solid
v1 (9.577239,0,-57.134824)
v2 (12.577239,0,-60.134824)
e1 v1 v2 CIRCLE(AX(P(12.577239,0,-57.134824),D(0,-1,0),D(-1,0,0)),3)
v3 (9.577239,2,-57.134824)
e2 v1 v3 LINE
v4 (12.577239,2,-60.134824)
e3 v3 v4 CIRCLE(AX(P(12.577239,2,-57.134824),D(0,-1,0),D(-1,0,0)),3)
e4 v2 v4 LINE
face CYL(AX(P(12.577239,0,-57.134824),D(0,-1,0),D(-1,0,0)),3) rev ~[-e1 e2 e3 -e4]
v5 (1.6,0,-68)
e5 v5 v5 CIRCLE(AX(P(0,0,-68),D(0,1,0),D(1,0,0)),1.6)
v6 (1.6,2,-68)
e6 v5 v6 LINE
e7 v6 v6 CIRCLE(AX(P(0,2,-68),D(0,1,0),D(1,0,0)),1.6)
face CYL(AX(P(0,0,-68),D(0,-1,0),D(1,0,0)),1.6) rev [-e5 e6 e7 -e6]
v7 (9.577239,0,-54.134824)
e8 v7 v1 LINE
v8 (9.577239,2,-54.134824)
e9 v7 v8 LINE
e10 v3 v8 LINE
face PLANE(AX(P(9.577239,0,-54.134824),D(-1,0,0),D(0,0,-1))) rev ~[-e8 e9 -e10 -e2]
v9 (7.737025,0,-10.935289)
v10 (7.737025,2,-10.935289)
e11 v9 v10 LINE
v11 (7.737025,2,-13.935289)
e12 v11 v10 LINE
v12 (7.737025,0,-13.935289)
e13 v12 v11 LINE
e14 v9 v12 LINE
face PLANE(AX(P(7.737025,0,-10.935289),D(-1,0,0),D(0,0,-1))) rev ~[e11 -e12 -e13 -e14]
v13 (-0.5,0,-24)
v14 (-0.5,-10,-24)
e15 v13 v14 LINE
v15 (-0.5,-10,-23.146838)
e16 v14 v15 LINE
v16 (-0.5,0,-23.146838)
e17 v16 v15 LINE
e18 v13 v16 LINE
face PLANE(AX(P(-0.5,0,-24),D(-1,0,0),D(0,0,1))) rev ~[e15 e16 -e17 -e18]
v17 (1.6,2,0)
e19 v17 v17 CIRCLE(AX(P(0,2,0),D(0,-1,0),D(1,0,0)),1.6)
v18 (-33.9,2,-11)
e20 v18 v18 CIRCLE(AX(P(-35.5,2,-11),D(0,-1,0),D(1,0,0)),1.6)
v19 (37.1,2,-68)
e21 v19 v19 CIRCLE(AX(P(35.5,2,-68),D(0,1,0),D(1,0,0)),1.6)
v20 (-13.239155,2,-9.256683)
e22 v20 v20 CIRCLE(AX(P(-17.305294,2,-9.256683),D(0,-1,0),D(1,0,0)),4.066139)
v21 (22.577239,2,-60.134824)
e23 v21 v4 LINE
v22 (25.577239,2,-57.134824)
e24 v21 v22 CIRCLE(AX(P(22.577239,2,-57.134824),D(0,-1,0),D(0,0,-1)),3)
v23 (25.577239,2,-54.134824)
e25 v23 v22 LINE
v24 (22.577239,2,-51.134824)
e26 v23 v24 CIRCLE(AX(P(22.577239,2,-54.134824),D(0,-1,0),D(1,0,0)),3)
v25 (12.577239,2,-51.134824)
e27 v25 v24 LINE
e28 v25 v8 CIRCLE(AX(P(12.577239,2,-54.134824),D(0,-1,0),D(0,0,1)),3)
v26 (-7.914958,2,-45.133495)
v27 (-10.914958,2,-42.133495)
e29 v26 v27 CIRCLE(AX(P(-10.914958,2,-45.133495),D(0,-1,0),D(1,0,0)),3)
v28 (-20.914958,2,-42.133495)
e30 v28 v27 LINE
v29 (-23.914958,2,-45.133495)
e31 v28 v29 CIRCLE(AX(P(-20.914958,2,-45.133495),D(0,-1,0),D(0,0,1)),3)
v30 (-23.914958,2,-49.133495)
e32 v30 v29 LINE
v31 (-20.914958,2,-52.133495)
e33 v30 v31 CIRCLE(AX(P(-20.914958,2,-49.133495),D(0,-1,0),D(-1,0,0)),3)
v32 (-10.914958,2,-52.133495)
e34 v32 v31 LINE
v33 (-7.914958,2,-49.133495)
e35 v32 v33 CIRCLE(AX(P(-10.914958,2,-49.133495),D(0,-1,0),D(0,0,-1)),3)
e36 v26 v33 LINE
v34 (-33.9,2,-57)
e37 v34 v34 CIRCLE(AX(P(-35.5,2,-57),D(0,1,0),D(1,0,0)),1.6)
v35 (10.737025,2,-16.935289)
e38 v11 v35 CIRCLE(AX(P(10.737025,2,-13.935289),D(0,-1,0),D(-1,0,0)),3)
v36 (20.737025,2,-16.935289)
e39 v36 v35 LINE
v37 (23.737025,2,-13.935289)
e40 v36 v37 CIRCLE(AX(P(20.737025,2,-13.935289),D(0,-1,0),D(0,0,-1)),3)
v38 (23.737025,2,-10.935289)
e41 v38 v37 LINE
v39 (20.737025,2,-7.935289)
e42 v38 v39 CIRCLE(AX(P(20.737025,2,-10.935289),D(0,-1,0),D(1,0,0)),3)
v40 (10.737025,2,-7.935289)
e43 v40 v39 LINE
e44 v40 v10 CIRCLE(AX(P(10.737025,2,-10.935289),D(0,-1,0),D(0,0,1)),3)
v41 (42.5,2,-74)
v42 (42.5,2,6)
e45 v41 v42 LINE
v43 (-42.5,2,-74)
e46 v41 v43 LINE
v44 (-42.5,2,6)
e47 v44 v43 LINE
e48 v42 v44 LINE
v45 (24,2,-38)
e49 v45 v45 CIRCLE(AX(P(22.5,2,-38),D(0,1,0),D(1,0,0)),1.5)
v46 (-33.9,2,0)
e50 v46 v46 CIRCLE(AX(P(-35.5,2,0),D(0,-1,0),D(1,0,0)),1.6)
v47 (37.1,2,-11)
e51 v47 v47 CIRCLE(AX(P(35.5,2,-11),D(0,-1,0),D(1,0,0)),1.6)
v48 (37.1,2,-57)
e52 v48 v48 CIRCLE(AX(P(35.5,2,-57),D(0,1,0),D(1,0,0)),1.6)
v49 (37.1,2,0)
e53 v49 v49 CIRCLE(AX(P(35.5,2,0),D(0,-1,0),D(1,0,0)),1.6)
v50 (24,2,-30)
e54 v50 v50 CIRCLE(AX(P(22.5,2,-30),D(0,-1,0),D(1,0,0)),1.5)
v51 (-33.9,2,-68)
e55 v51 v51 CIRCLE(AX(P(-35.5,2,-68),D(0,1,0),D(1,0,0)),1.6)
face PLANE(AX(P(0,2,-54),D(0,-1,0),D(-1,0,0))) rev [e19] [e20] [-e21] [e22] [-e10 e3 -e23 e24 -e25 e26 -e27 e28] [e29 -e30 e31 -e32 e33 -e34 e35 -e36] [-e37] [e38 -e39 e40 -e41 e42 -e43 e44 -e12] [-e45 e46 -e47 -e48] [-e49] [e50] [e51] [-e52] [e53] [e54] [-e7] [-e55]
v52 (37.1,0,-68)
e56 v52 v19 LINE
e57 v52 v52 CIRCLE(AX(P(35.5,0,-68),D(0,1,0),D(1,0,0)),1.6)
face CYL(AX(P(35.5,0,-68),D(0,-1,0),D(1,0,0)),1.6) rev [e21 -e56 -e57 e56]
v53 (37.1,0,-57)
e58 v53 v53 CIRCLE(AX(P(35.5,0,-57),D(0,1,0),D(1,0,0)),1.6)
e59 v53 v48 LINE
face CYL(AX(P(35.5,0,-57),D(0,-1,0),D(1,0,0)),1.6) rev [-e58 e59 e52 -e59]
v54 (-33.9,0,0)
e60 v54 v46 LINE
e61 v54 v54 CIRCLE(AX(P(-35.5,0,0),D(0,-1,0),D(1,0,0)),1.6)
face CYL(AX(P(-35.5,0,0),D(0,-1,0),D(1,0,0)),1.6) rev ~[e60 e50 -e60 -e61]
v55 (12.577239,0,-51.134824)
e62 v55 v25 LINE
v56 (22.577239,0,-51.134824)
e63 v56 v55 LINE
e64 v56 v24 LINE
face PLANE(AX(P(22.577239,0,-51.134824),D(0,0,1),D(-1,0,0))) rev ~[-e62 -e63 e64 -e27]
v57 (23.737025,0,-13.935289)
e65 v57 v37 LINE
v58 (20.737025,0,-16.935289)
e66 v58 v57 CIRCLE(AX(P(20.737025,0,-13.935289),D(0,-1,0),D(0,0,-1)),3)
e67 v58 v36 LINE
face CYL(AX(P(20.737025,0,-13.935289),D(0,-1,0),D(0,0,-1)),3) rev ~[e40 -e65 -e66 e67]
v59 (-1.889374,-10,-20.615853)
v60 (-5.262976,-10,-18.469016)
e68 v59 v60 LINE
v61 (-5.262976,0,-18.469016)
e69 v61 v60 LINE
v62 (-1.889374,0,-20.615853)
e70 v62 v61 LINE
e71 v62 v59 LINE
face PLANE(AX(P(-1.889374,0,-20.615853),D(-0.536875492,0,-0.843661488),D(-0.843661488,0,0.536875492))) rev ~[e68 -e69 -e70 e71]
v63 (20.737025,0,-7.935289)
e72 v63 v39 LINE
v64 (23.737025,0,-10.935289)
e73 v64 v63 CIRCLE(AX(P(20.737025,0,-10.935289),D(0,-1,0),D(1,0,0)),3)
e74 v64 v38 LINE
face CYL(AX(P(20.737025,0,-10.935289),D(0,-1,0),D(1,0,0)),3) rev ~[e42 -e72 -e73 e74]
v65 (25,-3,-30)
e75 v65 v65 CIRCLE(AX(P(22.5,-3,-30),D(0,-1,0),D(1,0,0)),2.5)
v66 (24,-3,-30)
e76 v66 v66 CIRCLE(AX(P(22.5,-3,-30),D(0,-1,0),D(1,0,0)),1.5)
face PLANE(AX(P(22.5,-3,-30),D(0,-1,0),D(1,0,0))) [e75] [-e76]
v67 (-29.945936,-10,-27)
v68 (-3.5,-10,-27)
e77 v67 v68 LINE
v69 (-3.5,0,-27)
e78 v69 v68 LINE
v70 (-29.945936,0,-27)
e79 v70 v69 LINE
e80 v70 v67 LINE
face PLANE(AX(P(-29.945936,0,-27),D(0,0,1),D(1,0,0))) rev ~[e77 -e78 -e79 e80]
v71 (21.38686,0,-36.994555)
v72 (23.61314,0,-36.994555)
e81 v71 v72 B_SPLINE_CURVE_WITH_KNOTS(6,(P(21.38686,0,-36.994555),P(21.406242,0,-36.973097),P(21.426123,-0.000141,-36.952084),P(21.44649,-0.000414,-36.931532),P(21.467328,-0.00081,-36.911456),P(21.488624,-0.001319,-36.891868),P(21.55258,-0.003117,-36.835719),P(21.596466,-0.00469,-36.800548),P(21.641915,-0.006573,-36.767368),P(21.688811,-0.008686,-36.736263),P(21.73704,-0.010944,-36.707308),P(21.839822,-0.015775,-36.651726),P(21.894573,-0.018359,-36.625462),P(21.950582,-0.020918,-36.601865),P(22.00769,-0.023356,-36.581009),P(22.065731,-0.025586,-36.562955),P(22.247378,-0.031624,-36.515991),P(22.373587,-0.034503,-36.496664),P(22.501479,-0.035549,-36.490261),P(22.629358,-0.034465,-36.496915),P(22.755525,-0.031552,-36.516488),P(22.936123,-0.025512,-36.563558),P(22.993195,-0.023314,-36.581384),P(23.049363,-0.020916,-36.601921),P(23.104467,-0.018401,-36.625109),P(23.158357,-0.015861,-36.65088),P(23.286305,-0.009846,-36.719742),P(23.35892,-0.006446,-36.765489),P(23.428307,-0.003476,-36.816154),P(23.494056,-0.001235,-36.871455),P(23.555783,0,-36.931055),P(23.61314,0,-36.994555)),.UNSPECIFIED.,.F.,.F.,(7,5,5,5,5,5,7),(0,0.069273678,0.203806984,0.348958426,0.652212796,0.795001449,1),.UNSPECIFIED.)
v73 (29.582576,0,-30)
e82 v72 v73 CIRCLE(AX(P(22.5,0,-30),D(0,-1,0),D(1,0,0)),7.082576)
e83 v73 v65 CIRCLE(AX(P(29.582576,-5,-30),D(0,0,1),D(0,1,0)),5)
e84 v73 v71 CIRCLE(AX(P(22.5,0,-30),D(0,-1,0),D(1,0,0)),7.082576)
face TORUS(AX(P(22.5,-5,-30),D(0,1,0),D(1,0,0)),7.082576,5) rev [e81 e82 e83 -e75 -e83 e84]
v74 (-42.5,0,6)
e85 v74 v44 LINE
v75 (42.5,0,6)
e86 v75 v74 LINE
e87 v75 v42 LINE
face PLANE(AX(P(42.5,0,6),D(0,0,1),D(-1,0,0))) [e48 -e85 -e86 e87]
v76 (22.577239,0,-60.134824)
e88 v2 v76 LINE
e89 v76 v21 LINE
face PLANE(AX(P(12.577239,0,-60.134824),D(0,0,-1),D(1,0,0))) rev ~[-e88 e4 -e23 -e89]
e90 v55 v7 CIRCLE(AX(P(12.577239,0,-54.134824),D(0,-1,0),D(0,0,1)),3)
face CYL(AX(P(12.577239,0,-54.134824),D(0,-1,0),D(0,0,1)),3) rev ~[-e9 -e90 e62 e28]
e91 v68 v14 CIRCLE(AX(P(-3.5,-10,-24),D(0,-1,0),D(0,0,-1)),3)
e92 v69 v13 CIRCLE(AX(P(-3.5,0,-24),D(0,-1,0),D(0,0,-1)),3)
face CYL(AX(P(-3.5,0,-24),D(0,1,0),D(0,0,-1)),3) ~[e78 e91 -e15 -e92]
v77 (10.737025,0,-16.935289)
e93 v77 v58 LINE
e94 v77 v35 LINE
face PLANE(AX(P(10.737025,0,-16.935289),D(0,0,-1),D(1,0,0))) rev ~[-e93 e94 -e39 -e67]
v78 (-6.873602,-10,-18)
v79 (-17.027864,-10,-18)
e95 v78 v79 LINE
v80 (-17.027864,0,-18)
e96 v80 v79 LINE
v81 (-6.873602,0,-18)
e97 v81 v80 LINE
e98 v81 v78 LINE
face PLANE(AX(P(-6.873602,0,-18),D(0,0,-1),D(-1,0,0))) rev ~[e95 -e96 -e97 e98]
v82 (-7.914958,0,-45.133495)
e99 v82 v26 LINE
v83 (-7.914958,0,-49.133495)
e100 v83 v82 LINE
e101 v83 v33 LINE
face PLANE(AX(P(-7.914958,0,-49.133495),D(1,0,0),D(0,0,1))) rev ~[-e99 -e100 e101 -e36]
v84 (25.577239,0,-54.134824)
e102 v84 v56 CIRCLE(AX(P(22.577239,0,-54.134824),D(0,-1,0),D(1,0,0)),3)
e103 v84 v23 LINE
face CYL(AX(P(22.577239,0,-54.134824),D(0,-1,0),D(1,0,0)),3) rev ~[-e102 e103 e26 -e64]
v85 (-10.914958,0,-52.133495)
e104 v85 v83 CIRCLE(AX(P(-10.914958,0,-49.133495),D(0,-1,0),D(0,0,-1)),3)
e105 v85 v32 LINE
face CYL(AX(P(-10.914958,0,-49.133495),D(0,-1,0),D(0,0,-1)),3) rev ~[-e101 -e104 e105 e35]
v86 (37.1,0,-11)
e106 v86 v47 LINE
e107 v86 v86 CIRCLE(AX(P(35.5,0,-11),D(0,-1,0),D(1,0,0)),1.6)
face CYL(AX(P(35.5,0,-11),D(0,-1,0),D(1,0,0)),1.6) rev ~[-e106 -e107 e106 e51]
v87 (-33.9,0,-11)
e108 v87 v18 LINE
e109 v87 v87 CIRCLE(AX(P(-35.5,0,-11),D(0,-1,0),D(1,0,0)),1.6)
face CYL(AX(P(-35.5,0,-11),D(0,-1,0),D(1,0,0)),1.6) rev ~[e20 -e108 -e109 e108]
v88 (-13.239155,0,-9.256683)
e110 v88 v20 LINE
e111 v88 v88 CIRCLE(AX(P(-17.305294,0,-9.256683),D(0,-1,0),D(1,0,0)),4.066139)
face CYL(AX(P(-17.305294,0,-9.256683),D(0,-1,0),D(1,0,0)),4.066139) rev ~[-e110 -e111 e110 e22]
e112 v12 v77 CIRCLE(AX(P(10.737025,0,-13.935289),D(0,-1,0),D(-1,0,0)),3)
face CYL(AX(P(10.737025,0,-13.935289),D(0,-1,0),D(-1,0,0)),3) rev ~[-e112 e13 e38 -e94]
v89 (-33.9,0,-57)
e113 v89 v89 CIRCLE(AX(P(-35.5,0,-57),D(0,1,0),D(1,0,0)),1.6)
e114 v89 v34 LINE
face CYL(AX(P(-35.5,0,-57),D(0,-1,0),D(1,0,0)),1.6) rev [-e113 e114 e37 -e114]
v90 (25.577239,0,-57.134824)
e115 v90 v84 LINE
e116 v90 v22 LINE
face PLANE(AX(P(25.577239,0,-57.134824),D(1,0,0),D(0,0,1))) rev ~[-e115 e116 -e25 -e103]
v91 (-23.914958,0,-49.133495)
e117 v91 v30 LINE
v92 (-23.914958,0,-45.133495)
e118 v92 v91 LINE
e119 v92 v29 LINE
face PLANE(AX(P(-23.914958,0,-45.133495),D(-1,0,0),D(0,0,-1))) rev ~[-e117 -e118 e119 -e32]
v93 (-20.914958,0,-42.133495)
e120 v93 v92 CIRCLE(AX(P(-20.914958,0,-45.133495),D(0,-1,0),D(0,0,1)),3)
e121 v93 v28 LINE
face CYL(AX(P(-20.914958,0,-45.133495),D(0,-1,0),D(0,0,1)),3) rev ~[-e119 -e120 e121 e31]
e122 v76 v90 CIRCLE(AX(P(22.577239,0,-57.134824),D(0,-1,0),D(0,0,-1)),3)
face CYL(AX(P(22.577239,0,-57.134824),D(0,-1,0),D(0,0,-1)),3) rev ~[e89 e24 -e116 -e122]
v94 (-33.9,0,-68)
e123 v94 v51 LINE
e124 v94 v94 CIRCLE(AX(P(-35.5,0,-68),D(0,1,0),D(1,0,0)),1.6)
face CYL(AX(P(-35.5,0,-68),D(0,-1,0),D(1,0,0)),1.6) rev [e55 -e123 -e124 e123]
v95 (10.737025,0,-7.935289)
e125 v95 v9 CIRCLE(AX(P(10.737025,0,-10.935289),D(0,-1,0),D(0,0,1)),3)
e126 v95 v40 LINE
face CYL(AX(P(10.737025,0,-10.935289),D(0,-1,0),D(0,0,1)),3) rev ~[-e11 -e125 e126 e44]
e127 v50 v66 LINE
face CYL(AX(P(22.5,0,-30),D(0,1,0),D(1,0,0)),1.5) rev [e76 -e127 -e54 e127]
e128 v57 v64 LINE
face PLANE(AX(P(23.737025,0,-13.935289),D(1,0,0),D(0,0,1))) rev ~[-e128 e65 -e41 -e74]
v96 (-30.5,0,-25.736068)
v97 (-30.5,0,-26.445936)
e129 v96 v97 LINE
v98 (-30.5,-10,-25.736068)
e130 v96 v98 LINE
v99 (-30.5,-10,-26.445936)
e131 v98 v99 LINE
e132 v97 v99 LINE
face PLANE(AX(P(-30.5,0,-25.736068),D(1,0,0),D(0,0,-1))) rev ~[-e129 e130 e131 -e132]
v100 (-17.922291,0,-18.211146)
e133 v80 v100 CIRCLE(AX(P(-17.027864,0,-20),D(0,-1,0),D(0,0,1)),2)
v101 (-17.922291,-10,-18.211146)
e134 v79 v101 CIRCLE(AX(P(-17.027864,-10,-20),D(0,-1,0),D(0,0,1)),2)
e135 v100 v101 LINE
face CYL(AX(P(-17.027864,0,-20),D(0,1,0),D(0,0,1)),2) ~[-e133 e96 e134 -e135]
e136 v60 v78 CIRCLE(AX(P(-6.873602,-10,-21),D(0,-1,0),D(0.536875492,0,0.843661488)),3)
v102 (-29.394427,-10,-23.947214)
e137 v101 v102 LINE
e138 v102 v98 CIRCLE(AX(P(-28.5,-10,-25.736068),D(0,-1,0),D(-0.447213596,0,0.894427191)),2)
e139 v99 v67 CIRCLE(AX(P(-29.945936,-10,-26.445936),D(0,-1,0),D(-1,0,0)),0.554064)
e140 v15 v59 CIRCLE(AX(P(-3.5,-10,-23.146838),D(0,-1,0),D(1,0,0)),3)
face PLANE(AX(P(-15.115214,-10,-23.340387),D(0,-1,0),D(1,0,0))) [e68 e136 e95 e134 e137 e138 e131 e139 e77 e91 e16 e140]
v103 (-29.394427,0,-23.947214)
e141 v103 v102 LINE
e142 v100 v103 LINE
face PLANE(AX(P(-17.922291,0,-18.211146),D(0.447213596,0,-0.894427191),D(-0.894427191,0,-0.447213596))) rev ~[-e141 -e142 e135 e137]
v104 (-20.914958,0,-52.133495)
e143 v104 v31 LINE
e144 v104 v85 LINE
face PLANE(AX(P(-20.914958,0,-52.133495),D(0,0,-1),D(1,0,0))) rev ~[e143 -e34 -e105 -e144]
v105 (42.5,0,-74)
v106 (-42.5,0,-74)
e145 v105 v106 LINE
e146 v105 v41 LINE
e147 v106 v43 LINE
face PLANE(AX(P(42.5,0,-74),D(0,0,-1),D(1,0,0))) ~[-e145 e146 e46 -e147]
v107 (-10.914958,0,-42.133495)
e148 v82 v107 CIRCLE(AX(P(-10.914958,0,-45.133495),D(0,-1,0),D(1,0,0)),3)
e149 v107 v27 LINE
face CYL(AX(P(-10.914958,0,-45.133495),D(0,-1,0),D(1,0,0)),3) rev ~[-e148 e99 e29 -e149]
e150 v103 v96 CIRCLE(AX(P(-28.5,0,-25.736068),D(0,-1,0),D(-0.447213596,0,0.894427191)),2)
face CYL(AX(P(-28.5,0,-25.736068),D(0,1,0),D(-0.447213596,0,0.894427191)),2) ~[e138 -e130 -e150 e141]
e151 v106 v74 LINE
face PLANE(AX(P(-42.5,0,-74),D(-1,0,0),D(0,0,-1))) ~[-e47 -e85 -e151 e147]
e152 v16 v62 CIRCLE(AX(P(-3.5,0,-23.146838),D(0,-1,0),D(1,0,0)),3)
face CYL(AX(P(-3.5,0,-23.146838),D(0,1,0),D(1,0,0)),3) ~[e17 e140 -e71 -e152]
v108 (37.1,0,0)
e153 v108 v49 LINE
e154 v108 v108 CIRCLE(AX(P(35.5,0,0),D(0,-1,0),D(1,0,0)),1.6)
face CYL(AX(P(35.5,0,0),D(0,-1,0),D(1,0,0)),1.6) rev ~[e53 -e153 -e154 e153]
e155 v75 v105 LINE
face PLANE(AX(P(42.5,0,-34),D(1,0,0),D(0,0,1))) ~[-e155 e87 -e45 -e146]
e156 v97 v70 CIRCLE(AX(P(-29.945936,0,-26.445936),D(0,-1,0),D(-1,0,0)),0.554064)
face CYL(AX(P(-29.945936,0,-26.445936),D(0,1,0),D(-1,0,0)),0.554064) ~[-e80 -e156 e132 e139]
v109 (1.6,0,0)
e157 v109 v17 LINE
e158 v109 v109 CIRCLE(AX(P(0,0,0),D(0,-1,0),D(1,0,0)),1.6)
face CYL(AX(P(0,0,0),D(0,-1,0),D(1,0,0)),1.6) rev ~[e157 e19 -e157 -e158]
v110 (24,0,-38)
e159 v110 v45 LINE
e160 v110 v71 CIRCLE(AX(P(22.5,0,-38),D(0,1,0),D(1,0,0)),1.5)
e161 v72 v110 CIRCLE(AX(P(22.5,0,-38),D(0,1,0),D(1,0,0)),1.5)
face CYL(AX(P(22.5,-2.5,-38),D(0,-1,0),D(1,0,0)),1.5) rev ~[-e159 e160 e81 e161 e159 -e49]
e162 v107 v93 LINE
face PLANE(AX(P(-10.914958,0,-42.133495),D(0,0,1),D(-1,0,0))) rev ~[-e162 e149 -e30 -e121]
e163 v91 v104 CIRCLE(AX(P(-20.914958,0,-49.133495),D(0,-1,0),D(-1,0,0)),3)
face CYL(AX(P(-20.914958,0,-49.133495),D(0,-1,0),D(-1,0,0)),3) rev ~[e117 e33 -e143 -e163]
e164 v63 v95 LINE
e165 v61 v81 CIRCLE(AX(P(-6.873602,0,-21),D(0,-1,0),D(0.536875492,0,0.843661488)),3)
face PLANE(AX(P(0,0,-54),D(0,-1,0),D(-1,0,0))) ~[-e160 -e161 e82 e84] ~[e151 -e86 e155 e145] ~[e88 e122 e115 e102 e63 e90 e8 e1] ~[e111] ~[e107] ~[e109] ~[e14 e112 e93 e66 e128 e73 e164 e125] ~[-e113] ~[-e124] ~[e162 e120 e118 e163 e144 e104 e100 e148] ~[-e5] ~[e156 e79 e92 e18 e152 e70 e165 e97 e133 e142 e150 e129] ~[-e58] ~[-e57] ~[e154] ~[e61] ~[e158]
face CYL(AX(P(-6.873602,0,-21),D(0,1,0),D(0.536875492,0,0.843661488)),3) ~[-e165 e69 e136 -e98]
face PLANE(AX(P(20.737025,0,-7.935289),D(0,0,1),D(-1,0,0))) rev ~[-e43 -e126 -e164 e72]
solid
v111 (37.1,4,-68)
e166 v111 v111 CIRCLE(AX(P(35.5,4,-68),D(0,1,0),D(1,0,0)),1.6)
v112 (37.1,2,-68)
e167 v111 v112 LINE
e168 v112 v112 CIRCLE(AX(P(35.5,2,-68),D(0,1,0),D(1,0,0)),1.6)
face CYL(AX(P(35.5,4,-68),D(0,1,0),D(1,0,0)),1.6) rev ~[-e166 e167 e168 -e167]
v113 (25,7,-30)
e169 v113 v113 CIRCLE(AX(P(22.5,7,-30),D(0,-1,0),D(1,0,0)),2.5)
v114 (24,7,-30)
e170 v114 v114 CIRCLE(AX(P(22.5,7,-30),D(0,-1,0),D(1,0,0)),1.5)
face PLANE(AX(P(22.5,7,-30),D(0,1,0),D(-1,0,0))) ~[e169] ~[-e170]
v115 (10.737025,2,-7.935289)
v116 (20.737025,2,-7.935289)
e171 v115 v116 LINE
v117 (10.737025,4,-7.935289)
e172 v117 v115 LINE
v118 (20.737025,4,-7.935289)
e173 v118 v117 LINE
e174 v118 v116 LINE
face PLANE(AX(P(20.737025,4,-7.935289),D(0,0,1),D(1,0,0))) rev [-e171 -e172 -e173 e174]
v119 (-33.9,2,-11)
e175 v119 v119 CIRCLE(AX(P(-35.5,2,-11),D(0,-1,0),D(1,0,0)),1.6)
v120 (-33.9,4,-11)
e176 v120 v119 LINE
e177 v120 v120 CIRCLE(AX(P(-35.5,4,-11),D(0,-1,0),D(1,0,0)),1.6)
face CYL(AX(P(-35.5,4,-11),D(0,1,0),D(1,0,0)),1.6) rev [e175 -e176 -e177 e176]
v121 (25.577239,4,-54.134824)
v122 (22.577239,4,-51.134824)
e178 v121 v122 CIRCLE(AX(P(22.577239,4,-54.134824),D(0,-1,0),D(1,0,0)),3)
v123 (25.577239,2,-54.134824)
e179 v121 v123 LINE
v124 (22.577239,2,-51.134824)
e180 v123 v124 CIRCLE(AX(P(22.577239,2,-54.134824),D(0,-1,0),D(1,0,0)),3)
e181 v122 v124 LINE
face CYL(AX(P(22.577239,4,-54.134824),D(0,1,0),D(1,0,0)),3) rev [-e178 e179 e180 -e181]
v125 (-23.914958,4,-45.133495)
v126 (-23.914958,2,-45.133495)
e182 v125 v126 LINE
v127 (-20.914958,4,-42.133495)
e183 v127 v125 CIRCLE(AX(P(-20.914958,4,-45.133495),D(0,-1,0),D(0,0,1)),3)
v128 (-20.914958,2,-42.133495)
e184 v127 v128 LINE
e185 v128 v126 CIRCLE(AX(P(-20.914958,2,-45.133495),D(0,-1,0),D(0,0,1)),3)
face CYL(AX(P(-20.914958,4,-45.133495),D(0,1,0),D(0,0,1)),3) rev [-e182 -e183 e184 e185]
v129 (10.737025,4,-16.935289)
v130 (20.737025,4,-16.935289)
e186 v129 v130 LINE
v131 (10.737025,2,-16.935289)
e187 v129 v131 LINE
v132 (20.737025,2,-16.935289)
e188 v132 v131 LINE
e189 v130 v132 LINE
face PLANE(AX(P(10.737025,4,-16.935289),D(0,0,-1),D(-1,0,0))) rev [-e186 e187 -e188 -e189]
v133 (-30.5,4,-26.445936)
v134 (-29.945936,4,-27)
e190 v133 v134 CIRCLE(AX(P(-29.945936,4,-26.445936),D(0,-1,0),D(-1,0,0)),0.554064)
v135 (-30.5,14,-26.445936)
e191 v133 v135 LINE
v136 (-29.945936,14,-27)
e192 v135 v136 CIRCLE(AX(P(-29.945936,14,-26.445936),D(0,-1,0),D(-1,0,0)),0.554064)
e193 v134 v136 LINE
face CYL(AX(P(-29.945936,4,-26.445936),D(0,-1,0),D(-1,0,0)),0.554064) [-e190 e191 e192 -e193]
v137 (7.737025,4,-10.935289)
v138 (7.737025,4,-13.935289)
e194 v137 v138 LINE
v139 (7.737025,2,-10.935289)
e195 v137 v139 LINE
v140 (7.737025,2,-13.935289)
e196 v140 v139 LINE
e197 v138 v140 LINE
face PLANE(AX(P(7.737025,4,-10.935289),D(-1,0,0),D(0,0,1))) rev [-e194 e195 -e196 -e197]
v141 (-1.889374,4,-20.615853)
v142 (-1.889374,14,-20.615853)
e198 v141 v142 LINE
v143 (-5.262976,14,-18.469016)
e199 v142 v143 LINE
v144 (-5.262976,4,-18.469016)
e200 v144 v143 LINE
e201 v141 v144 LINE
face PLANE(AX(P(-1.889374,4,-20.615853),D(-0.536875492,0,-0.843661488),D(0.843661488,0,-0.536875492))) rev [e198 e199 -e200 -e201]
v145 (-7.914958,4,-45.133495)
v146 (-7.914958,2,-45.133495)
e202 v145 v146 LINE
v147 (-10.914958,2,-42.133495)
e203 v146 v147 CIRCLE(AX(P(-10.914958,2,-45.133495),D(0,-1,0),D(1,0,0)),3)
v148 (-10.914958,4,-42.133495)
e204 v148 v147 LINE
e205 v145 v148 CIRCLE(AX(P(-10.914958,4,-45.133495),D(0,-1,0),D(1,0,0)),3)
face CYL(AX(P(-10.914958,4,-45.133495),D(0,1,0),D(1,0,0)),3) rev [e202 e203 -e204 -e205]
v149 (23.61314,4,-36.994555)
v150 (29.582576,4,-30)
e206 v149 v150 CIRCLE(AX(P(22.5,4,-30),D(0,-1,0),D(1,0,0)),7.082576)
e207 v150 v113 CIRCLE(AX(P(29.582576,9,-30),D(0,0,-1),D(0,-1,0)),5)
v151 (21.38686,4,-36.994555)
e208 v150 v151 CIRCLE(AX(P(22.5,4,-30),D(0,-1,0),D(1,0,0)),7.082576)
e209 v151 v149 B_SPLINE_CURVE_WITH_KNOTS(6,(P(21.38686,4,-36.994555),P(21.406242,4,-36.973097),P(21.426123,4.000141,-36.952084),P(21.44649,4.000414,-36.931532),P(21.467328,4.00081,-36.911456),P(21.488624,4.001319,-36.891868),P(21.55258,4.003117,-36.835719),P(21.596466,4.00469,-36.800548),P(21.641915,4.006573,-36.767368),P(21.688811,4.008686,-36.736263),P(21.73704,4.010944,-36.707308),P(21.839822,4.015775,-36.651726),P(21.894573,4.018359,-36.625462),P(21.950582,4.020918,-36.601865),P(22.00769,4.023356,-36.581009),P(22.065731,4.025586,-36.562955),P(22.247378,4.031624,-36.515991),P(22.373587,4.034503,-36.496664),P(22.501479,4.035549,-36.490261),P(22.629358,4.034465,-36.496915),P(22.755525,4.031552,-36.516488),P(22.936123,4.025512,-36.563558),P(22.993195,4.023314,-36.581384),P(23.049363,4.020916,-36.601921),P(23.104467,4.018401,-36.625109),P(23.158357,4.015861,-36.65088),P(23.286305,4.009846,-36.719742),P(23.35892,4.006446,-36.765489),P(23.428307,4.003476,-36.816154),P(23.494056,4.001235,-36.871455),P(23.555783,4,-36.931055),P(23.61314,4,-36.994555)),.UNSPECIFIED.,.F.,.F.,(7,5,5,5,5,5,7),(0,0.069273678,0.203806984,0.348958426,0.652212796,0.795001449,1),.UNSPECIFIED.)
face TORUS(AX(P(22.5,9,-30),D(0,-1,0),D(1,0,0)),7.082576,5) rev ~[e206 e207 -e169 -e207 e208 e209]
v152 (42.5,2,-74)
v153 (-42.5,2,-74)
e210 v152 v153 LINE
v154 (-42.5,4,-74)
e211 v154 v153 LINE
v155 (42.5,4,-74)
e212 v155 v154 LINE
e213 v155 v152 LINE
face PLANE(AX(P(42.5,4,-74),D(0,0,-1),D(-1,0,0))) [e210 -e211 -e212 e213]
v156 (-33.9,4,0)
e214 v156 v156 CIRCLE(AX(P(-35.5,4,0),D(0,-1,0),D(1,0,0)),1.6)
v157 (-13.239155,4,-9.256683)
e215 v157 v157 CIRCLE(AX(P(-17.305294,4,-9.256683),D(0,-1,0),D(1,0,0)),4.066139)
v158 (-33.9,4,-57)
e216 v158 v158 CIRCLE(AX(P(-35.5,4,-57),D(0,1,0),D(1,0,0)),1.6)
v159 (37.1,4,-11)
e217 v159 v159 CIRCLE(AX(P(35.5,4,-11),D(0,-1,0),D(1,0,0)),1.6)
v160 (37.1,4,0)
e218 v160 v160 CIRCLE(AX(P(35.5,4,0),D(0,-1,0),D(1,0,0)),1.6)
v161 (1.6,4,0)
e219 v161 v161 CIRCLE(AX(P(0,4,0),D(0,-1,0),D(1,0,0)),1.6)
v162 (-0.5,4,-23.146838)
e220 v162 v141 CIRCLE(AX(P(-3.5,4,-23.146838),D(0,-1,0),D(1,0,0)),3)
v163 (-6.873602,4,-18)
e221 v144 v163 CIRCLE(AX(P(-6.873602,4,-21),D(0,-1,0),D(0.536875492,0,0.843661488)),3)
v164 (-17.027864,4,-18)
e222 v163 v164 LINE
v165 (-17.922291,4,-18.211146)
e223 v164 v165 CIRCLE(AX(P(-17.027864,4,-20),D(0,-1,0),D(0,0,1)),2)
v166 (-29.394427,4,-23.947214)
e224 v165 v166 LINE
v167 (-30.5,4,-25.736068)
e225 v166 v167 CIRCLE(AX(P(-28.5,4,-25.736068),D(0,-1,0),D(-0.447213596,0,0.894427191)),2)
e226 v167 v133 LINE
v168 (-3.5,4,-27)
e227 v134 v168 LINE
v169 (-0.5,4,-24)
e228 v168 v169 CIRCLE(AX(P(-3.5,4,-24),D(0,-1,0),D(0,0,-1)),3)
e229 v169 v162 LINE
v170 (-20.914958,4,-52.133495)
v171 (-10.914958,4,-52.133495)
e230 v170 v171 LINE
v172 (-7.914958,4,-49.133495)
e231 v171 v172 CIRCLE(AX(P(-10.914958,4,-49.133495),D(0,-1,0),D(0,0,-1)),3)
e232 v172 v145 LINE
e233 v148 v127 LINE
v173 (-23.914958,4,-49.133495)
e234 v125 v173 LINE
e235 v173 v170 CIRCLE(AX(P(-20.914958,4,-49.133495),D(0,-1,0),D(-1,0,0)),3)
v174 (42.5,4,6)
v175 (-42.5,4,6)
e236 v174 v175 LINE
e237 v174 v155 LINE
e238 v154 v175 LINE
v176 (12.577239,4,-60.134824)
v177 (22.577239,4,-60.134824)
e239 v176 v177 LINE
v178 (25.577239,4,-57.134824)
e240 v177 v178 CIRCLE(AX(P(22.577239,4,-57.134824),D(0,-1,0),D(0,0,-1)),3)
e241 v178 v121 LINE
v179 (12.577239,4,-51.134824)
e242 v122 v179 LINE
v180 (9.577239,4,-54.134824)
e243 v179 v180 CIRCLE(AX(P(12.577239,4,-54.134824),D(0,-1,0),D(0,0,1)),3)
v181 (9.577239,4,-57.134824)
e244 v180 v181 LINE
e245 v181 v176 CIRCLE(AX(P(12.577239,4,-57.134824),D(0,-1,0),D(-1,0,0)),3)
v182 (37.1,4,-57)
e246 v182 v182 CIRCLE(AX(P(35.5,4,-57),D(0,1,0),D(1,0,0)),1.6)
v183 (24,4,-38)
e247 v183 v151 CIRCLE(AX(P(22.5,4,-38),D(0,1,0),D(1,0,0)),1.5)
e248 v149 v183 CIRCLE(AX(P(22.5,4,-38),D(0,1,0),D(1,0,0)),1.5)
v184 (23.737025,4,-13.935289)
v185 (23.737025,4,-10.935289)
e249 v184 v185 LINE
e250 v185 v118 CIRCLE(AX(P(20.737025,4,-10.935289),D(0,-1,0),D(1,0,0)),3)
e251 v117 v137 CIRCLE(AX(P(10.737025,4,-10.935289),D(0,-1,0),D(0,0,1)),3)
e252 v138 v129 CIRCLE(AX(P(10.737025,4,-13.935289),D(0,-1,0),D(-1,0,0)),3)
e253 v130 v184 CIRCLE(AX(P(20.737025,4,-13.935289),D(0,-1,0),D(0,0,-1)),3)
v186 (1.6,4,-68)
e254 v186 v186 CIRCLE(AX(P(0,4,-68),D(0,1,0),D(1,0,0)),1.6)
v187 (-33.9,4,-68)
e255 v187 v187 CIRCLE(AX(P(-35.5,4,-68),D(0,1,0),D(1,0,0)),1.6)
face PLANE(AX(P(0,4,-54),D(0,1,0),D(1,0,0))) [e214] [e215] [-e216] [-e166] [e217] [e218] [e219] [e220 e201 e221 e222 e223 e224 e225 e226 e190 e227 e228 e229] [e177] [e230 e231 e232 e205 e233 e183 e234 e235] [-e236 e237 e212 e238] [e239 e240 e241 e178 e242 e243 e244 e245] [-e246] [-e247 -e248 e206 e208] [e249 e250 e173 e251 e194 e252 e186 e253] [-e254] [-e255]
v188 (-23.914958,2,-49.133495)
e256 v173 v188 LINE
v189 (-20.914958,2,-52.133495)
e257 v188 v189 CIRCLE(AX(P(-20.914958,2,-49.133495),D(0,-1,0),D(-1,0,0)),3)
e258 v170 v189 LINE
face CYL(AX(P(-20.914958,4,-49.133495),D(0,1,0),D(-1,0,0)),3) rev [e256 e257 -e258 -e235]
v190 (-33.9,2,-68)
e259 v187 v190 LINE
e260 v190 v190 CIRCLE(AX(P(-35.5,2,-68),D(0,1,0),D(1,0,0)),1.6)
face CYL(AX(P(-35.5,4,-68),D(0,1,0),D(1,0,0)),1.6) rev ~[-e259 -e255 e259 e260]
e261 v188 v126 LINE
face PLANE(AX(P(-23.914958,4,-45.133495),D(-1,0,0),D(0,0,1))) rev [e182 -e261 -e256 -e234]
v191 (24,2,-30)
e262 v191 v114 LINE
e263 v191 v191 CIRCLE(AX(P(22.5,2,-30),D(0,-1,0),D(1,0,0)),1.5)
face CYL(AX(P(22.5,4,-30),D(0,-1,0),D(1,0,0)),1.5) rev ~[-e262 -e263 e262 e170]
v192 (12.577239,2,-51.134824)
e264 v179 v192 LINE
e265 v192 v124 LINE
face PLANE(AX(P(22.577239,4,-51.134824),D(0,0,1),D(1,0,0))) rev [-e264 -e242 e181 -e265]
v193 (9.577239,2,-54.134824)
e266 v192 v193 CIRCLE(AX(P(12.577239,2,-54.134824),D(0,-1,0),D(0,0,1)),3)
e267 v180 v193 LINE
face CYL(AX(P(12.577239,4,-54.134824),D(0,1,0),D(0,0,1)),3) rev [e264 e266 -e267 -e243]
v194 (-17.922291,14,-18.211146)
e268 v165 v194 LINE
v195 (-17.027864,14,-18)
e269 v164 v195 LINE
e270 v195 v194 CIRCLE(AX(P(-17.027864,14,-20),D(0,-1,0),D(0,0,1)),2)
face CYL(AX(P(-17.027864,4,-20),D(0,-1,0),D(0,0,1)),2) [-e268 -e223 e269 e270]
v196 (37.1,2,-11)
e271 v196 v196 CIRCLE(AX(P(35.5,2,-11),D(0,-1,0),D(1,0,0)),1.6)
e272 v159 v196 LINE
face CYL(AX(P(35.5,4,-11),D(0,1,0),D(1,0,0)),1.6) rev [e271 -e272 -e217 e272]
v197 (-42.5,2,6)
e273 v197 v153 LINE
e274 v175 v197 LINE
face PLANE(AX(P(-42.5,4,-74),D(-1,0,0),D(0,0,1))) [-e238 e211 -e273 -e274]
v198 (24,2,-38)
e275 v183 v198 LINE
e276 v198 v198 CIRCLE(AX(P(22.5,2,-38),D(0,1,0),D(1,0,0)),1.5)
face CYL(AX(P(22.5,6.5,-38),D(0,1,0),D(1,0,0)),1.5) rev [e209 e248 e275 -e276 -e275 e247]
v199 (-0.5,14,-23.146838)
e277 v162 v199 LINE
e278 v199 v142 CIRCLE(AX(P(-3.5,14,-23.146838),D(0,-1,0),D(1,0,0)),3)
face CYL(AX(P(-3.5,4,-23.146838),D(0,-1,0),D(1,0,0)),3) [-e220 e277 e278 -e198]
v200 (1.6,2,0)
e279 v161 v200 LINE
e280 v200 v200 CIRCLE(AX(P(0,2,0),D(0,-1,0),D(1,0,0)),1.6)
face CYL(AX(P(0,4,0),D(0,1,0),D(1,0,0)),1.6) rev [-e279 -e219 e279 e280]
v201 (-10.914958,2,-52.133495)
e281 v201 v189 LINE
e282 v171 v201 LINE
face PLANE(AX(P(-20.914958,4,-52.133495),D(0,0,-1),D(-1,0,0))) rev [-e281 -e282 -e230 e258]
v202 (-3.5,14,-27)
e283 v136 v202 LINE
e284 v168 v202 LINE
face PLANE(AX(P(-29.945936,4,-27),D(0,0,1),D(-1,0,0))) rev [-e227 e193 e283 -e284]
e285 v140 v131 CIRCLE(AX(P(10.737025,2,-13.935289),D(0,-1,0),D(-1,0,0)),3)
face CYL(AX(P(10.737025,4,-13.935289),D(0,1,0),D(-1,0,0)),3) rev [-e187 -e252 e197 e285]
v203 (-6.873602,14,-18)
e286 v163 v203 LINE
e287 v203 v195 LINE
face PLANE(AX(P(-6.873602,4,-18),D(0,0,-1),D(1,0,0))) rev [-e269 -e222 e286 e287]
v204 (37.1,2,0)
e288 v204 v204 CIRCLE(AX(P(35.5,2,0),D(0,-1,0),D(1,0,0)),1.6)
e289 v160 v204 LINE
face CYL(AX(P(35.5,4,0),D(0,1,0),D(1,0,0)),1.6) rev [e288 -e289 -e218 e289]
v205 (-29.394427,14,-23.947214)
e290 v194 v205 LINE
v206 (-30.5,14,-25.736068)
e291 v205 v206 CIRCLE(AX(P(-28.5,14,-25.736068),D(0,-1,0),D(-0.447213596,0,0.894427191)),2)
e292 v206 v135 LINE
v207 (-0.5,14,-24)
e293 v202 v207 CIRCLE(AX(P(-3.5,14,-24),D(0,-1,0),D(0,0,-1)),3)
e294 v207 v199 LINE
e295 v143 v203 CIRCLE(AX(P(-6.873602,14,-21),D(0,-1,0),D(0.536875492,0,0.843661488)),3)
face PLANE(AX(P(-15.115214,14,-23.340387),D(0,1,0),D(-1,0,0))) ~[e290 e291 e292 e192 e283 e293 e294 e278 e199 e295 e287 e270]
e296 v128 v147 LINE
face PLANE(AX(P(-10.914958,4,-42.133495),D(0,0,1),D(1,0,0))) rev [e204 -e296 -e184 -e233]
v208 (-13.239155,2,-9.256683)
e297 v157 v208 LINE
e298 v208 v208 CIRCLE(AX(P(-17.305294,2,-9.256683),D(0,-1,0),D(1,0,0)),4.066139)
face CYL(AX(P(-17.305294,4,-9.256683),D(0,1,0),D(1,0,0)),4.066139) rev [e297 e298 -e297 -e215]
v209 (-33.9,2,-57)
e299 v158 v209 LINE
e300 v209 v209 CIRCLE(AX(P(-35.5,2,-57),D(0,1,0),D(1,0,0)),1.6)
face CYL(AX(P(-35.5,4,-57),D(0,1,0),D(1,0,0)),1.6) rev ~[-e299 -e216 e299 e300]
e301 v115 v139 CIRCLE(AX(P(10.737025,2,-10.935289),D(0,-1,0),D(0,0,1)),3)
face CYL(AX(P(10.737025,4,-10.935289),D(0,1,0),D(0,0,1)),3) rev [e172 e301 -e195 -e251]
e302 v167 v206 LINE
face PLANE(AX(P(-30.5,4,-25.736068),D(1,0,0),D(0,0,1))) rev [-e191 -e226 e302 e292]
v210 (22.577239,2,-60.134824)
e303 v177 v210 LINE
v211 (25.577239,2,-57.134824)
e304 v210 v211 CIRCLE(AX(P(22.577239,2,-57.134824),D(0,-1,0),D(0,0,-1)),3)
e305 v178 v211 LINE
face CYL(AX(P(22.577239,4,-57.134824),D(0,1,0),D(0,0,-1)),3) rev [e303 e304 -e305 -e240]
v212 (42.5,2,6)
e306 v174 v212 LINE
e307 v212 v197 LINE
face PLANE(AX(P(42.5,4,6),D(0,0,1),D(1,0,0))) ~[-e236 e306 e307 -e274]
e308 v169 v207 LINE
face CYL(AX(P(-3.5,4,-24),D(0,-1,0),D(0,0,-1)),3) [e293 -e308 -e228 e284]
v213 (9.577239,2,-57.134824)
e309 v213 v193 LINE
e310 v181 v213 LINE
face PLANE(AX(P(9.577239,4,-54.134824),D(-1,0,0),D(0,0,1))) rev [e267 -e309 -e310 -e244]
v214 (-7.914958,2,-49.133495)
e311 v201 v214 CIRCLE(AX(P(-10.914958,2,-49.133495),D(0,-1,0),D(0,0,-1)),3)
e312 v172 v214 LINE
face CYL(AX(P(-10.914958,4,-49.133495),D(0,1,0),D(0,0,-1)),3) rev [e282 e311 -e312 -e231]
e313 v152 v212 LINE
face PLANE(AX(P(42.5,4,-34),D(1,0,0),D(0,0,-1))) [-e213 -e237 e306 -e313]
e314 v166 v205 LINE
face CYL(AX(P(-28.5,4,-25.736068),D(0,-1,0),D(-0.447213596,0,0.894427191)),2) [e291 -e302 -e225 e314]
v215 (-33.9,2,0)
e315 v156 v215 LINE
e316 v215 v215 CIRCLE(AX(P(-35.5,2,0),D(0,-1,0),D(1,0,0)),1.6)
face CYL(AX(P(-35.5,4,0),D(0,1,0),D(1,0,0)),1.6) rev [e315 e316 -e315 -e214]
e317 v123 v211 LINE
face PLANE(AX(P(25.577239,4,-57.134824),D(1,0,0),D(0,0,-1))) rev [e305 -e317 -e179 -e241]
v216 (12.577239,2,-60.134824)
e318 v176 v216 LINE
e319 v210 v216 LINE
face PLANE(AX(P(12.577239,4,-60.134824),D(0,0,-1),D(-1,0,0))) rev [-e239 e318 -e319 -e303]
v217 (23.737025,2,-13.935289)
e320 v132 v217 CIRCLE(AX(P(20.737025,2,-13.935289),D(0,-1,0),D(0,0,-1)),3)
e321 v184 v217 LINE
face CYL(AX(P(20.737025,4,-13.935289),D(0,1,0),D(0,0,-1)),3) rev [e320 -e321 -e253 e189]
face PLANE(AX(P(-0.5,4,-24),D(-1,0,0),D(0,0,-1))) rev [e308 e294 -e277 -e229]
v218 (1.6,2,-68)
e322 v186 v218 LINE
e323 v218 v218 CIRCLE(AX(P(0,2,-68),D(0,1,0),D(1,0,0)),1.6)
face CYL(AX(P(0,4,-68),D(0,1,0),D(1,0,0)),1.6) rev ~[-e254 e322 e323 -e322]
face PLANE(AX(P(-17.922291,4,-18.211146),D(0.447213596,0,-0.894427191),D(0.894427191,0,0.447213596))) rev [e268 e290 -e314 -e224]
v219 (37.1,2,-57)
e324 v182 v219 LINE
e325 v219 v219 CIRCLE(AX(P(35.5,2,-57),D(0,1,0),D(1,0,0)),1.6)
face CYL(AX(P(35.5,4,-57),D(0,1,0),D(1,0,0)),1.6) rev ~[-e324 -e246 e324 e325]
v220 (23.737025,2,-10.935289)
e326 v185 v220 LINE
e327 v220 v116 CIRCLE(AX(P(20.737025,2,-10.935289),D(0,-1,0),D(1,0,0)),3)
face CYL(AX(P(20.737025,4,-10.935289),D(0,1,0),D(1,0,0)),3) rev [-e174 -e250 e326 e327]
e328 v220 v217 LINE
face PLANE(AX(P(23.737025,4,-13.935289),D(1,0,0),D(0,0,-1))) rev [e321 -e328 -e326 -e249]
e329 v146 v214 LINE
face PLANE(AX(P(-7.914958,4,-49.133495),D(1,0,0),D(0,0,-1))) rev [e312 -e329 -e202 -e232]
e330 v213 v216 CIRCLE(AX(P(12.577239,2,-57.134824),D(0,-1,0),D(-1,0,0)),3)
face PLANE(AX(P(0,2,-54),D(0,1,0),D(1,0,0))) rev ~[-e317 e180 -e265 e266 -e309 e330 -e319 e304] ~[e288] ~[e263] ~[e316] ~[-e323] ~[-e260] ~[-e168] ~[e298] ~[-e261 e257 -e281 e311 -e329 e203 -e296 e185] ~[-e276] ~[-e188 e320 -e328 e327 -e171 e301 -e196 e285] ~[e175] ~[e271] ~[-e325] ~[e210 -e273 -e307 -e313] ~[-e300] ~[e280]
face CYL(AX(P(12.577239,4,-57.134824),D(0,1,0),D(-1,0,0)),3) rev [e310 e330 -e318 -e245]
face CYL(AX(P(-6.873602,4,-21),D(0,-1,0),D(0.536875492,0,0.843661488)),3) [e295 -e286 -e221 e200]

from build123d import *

# Parameters (mm, degrees)
F0_R          = 2.5
F0_R_2        = 1.6
F0_R_3        = 1.5
F1_DEPTH      = 2
F3_DEPTH      = 10
F4_DEPTH      = 3
F4_DEPTH_BACK = 2
F5_S5_R       = 1.5
F5_T6_DEPTH   = 13
F6_R          = 4.0661391715
F7_DEPTH      = 25


# Not quite as in the source:
# - a fillet or chamfer that OpenCascade refuses, or shapes differently, is made with other operations: its cross-section is extruded or revolved along the edge and cut away or added


with BuildPart() as f1:
    # F0 (on Front) → F1 (new body)
    with BuildSketch(Plane.XZ):
        Polygon((42.5, -4), (42.5, 4), (42.5, 6), (-42.5, 6), (-42.5, 4), (-42.5, -4), (-42.5, -34), (42.5, -34), align=None)
        with BuildLine():
            Line((-3.5, -27), (-29.945935972, -27))
            ThreePointArc((-29.945935972, -27), (-30.3377184034, -26.8377184034), (-30.5, -26.445935972))
            Line((-30.5, -26.445935972), (-30.5, -25.7360679775))
            ThreePointArc((-30.5, -25.7360679775), (-30.2013016167, -24.6846057533), (-29.394427191, -23.9472135955))
            Line((-29.394427191, -23.9472135955), (-17.922291236, -18.211145618))
            ThreePointArc((-17.922291236, -18.211145618), (-17.4873698861, -18.0535020211), (-17.027864045, -18))
            Line((-17.027864045, -18), (-6.8736020616, -18))
            ThreePointArc((-6.8736020616, -18), (-6.0348391003, -18.1196394853), (-5.262975585, -18.4690155368))
            Line((-5.262975585, -18.4690155368), (-1.8893735234, -20.6158532124))
            ThreePointArc((-1.8893735234, -20.6158532124), (-0.87018257, -21.7032102011), (-0.5, -23.1468376756))
            Line((-0.5, -23.1468376756), (-0.5, -24))
            ThreePointArc((-0.5, -24), (-1.3786796564, -26.1213203436), (-3.5, -27))
        make_face(mode=Mode.SUBTRACT)
        with Locations((22.5, -30)):
            Circle(F0_R, mode=Mode.SUBTRACT)
        with Locations((-35.5, -11)):
            Circle(F0_R_2, mode=Mode.SUBTRACT)
        with Locations((-35.5, 0)):
            Circle(F0_R_2, mode=Mode.SUBTRACT)
        with Locations((35.5, -11)):
            Circle(F0_R_2, mode=Mode.SUBTRACT)
        Circle(F0_R_2, mode=Mode.SUBTRACT)
        with Locations((35.5, 0)):
            Circle(F0_R_2, mode=Mode.SUBTRACT)
        with BuildLine():
            ThreePointArc((-30.5, -26.445935972), (-30.3377184034, -26.8377184034), (-29.945935972, -27))
            Line((-29.945935972, -27), (-3.5, -27))
            ThreePointArc((-3.5, -27), (-1.3786796564, -26.1213203436), (-0.5, -24))
            Line((-0.5, -24), (-0.5, -23.1468376756))
            ThreePointArc((-0.5, -23.1468376756), (-0.87018257, -21.7032102011), (-1.8893735234, -20.6158532124))
            Line((-1.8893735234, -20.6158532124), (-5.262975585, -18.4690155368))
            ThreePointArc((-5.262975585, -18.4690155368), (-6.0348391003, -18.1196394853), (-6.8736020616, -18))
            Line((-6.8736020616, -18), (-17.027864045, -18))
            ThreePointArc((-17.027864045, -18), (-17.4873698861, -18.0535020211), (-17.922291236, -18.211145618))
            Line((-17.922291236, -18.211145618), (-29.394427191, -23.9472135955))
            ThreePointArc((-29.394427191, -23.9472135955), (-30.2013016167, -24.6846057533), (-30.5, -25.7360679775))
            Line((-30.5, -25.7360679775), (-30.5, -26.445935972))
        make_face()
        with Locations((22.5, -30)):
            Circle(F0_R)
        with Locations((22.5, -30)):
            Circle(F0_R_3, mode=Mode.SUBTRACT)
    extrude(amount=-F1_DEPTH)

    # F2: F1 across face


with BuildPart() as f1_1:
    add(f1.part)
    add(f1.part.mirror(Plane(origin=(0, 1, -34), x_dir=(1, 0, 0), z_dir=(0, 0, -1))))

    # F0 (on Front) → F3 (join)
    with BuildSketch(Plane.XZ):
        with BuildLine():
            ThreePointArc((-30.5, -26.445935972), (-30.3377184034, -26.8377184034), (-29.945935972, -27))
            Line((-29.945935972, -27), (-3.5, -27))
            ThreePointArc((-3.5, -27), (-1.3786796564, -26.1213203436), (-0.5, -24))
            Line((-0.5, -24), (-0.5, -23.1468376756))
            ThreePointArc((-0.5, -23.1468376756), (-0.87018257, -21.7032102011), (-1.8893735234, -20.6158532124))
            Line((-1.8893735234, -20.6158532124), (-5.262975585, -18.4690155368))
            ThreePointArc((-5.262975585, -18.4690155368), (-6.0348391003, -18.1196394853), (-6.8736020616, -18))
            Line((-6.8736020616, -18), (-17.027864045, -18))
            ThreePointArc((-17.027864045, -18), (-17.4873698861, -18.0535020211), (-17.922291236, -18.211145618))
            Line((-17.922291236, -18.211145618), (-29.394427191, -23.9472135955))
            ThreePointArc((-29.394427191, -23.9472135955), (-30.2013016167, -24.6846057533), (-30.5, -25.7360679775))
            Line((-30.5, -25.7360679775), (-30.5, -26.445935972))
        make_face()
    extrude(amount=F3_DEPTH)

    # F0 (on Front) → F4 (join, two sides)
    with BuildSketch(Plane.XZ) as f4_sk:
        with Locations((22.5, -30)):
            Circle(F0_R)
        with Locations((22.5, -30)):
            Circle(F0_R_3, mode=Mode.SUBTRACT)
    extrude(amount=F4_DEPTH)
    extrude(f4_sk.sketch, amount=-F4_DEPTH_BACK)

    # F5: fillet of radius 5 on 1 edges, made by hand


with BuildPart() as f5_tool2:
    # F5_s3 → F5_t4 (revolve)
    with BuildSketch(Plane.XY.offset(-30)):
        with BuildLine():
            ThreePointArc((29.582575695, 0), (26.8439629074, -0.8166998673), (25, -3))
            Line((25, -3), (25, 0))
            Line((25, 0), (29.582575695, 0))
        make_face()
    revolve(axis=Axis((22.5, 0, -30), (0, -1, 0)))

    # F5_s5 → F5_t6 (cut, symmetric)
    with BuildSketch(Plane.XZ.offset(2.5)):
        with Locations((22.5, -38)):
            Circle(F5_S5_R)
    extrude(amount=F5_T6_DEPTH, both=True, mode=Mode.SUBTRACT)


with BuildPart() as f1_2:
    add(f1_1.part)

    # F5_t1: union F5_tool2
    add(f5_tool2.part)

    # F6 (on face) → F7 (cut)
    with BuildSketch(Plane.XZ):
        with BuildLine():
            Line((22.5772393979, -51.1348243654), (12.5772393979, -51.1348243654))
            ThreePointArc((12.5772393979, -51.1348243654), (10.4559190544, -52.0135040218), (9.5772393979, -54.1348243654))
            Line((9.5772393979, -54.1348243654), (9.5772393979, -57.1348243654))
            ThreePointArc((9.5772393979, -57.1348243654), (10.4559190544, -59.2561447089), (12.5772393979, -60.1348243654))
            Line((12.5772393979, -60.1348243654), (22.5772393979, -60.1348243654))
            ThreePointArc((22.5772393979, -60.1348243654), (24.6985597415, -59.2561447089), (25.5772393979, -57.1348243654))
            Line((25.5772393979, -57.1348243654), (25.5772393979, -54.1348243654))
            ThreePointArc((25.5772393979, -54.1348243654), (24.6985597415, -52.0135040218), (22.5772393979, -51.1348243654))
        make_face()
        with BuildLine():
            Line((-10.9149579704, -42.1334951818), (-20.9149579704, -42.1334951818))
            ThreePointArc((-20.9149579704, -42.1334951818), (-23.0362783139, -43.0121748382), (-23.9149579704, -45.1334951818))
            Line((-23.9149579704, -45.1334951818), (-23.9149579704, -49.1334951818))
            ThreePointArc((-23.9149579704, -49.1334951818), (-23.0362783139, -51.2548155254), (-20.9149579704, -52.1334951818))
            Line((-20.9149579704, -52.1334951818), (-10.9149579704, -52.1334951818))
            ThreePointArc((-10.9149579704, -52.1334951818), (-8.7936376268, -51.2548155254), (-7.9149579704, -49.1334951818))
            Line((-7.9149579704, -49.1334951818), (-7.9149579704, -45.1334951818))
            ThreePointArc((-7.9149579704, -45.1334951818), (-8.7936376268, -43.0121748382), (-10.9149579704, -42.1334951818))
        make_face()
        with BuildLine():
            Line((20.7370246872, -7.9352889061), (10.7370246872, -7.9352889061))
            ThreePointArc((10.7370246872, -7.9352889061), (8.6157043437, -8.8139685625), (7.7370246872, -10.9352889061))
            Line((7.7370246872, -10.9352889061), (7.7370246872, -13.9352889061))
            ThreePointArc((7.7370246872, -13.9352889061), (8.6157043437, -16.0566092497), (10.7370246872, -16.9352889061))
            Line((10.7370246872, -16.9352889061), (20.7370246872, -16.9352889061))
            ThreePointArc((20.7370246872, -16.9352889061), (22.8583450308, -16.0566092497), (23.7370246872, -13.9352889061))
            Line((23.7370246872, -13.9352889061), (23.7370246872, -10.9352889061))
            ThreePointArc((23.7370246872, -10.9352889061), (22.8583450308, -8.8139685625), (20.7370246872, -7.9352889061))
        make_face()
        with Locations((-17.3052940518, -9.25668329)):
            Circle(F6_R)
    extrude(amount=-F7_DEPTH, mode=Mode.SUBTRACT)


with BuildPart() as f8_1:
    # F8: instance of F1
    add(f1_2.part.mirror(Plane(origin=(-0.2465473767, 2, -33.8837241542), x_dir=(-1, 0, 0), z_dir=(0, 1, 0))))


solid = Compound([f1_2.part, f8_1.part])
